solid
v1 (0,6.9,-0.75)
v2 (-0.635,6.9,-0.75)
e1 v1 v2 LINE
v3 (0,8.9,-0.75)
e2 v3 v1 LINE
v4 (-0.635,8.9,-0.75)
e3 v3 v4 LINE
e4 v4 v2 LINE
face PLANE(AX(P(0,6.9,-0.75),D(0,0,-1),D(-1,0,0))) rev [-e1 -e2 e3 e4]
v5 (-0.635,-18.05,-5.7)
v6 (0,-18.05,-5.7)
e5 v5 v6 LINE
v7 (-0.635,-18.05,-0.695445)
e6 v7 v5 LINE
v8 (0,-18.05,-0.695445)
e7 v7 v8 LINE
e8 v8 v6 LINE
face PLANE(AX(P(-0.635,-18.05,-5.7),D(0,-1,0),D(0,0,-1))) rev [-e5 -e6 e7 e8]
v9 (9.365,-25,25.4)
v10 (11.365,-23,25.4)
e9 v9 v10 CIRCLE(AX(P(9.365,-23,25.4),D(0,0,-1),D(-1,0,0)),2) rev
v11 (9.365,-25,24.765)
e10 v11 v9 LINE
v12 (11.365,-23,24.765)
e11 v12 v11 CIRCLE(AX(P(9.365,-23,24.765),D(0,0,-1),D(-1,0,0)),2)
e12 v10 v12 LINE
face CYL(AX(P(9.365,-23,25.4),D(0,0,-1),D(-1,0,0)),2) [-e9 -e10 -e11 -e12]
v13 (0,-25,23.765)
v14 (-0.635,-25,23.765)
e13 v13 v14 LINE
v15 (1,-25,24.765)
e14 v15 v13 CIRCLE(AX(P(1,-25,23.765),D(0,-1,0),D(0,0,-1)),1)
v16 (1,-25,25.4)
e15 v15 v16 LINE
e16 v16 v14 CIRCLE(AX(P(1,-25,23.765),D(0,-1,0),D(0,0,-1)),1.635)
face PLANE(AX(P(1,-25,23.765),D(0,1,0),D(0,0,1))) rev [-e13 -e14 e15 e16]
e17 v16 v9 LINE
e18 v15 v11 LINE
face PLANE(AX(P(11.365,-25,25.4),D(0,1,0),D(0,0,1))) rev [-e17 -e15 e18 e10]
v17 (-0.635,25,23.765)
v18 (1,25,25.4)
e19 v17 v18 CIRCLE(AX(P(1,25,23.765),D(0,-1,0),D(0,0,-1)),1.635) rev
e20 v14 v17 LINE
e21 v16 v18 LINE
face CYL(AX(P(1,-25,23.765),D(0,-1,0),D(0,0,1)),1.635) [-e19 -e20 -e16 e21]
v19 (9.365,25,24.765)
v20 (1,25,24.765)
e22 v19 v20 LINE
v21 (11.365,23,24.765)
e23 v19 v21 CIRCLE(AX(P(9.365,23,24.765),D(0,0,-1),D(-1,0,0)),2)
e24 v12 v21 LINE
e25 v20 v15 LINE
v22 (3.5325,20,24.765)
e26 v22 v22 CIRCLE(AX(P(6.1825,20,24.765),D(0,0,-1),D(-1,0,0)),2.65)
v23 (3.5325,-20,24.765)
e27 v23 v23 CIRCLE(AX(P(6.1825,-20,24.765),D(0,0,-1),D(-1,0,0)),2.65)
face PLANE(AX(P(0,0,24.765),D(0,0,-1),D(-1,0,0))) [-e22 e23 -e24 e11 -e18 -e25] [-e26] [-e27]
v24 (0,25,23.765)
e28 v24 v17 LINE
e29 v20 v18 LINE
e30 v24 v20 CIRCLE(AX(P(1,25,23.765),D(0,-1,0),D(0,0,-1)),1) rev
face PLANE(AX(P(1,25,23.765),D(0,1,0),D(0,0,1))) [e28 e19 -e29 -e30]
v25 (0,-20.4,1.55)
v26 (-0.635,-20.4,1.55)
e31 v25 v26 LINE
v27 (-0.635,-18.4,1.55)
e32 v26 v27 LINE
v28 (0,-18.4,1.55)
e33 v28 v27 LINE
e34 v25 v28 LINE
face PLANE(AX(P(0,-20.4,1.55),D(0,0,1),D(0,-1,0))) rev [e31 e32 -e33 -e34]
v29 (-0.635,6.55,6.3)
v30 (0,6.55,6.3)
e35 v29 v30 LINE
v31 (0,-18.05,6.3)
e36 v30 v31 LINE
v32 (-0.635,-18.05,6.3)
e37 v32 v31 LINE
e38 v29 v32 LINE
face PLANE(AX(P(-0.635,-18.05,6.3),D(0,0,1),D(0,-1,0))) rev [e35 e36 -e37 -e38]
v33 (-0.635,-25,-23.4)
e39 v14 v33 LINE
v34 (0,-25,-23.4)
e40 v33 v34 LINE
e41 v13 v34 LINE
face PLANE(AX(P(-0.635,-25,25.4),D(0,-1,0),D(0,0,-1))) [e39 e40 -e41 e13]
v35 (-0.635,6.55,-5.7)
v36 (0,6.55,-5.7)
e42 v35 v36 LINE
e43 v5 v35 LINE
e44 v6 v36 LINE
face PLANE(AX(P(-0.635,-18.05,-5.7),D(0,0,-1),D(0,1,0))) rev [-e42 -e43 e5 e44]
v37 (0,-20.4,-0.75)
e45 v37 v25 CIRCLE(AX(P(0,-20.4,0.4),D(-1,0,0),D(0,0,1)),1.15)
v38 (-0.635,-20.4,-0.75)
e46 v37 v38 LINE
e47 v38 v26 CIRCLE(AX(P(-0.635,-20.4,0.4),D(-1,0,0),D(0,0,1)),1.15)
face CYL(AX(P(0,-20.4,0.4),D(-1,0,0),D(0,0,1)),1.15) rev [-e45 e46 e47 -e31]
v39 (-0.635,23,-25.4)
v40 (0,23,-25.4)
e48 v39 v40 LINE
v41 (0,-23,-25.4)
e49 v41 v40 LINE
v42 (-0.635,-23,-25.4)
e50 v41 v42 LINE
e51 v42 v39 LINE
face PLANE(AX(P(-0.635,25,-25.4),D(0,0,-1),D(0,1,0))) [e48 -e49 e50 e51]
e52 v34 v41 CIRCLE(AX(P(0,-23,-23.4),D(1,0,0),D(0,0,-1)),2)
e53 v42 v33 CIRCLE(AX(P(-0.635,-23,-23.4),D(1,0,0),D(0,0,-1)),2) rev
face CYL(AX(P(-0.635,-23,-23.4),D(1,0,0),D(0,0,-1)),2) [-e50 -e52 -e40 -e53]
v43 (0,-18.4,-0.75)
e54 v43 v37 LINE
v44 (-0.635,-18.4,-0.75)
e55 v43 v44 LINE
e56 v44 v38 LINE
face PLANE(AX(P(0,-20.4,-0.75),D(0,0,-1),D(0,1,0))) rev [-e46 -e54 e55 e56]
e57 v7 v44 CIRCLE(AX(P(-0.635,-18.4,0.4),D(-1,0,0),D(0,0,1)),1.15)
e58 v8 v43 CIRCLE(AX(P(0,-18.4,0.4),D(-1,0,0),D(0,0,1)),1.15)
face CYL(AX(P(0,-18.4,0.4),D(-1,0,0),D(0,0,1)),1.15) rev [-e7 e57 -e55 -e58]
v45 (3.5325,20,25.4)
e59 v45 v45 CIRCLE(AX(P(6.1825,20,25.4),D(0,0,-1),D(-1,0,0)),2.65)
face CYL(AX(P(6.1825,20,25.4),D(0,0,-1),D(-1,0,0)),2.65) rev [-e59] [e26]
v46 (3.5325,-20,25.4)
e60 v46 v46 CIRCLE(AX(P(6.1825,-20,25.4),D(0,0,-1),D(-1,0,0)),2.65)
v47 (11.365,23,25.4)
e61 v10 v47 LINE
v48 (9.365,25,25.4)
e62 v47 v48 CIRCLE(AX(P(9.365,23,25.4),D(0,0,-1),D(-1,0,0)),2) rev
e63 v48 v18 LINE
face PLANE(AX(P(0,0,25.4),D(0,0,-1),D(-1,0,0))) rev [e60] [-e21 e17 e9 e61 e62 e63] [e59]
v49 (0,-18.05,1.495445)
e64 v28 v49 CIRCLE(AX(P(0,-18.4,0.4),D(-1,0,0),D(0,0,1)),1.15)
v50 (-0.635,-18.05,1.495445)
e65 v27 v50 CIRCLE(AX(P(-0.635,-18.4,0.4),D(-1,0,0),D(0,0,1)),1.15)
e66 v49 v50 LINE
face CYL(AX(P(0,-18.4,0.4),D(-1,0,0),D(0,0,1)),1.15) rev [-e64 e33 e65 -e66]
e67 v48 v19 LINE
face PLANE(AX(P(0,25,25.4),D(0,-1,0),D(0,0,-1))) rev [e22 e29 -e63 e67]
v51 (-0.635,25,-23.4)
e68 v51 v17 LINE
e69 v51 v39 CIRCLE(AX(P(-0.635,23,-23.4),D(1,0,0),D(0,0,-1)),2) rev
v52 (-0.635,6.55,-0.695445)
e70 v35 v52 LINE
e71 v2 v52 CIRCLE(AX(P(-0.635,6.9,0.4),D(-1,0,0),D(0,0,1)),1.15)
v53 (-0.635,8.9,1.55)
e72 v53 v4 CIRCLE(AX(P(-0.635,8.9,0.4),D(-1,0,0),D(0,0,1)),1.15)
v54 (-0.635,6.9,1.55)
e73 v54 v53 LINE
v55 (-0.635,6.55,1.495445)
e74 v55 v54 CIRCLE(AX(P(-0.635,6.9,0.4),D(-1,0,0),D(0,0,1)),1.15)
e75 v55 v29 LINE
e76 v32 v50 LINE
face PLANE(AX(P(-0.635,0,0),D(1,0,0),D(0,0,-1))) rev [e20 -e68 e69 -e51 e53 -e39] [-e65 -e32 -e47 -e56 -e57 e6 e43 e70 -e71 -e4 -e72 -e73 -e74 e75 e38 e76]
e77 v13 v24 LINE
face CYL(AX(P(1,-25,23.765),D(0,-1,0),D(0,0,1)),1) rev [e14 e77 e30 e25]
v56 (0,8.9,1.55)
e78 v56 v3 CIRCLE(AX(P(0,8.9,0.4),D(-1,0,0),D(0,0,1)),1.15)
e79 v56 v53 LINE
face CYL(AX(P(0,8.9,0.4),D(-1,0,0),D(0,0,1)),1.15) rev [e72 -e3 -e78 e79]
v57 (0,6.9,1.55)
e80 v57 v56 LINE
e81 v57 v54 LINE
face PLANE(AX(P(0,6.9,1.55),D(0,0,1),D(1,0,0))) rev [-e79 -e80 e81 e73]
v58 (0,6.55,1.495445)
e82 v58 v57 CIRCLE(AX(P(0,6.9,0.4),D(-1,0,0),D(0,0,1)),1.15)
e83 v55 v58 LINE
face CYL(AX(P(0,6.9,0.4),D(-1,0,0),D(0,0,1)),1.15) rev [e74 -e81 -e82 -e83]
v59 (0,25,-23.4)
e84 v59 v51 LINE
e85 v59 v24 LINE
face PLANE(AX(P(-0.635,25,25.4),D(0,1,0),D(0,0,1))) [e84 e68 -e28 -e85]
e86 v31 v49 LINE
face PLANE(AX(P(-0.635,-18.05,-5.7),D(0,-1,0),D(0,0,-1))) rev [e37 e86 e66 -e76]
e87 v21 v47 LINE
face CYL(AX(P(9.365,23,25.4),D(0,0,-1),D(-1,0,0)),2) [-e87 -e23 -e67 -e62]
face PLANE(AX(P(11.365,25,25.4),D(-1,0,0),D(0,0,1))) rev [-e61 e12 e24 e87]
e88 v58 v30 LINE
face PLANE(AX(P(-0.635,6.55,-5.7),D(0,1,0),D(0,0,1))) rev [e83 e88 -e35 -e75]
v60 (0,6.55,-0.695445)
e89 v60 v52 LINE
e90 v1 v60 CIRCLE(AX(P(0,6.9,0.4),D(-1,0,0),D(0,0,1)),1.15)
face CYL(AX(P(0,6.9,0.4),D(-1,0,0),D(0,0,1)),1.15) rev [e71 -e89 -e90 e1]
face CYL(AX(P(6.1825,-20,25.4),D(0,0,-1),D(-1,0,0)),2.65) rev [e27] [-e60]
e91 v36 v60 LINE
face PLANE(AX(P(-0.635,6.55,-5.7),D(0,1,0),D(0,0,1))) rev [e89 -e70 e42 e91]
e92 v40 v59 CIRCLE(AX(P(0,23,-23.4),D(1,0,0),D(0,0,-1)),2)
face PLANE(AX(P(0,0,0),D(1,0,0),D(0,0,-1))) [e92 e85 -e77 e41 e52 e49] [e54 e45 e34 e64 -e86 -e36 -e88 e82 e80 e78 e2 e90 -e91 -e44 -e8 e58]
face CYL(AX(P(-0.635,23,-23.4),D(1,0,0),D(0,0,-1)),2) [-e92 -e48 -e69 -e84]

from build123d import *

# Parameters (mm, degrees)
SKETCH1_W                    = 50.8
SKETCH1_H                    = 50
BASE_FLANGE1_DEPTH           = 0.635
SKETCH9_W                    = 12
SKETCH9_H                    = 24.6
CUT_EXTRUDE1_DEPTH           = 36.644960724
CUT_EXTRUDE2_DEPTH           = 36.644960724
EDGE_FLANGE1_STRIP_W         = 4.54
EDGE_FLANGE1_STRIP_H         = 0.635
EDGE_FLANGE1_STRIP_CUT_DEPTH = 50
EDGE_FLANGE1_DEPTH           = 50
SKETCH14_R                   = 2.65
CUT_EXTRUDE3_DEPTH           = 58.189950603
FILLET1_R                    = 2


# Sheet-metal steps are written as plain solids
with BuildPart() as part:
    # Sketch1 → Base-Flange1 (new body)
    with BuildSketch(Plane(origin=(0, 0, 0), x_dir=(0, 0, -1), z_dir=(1, 0, 0))):
        Rectangle(SKETCH1_W, SKETCH1_H)
    extrude(amount=-BASE_FLANGE1_DEPTH)

    # Sketch9 → Cut-Extrude1 (cut, through all)
    with BuildSketch(Plane(origin=(0, 0, 0), x_dir=(0, 0, -1), z_dir=(1, 0, 0))):
        with Locations((-0.3, -5.75)):
            Rectangle(SKETCH9_W, SKETCH9_H)
    extrude(amount=-CUT_EXTRUDE1_DEPTH, mode=Mode.SUBTRACT)

    # Sketch10 → Cut-Extrude2 (cut, through all)
    with BuildSketch(Plane.ZY.offset(0.635)):
        with BuildLine():
            Line((-0.75, -20.4), (-0.75, -18.4))
            ThreePointArc((-0.75, -18.4), (0.4, -17.25), (1.55, -18.4))
            Line((1.55, -18.4), (1.55, -20.4))
            ThreePointArc((1.55, -20.4), (0.4, -21.55), (-0.75, -20.4))
        make_face()
        with BuildLine():
            Line((-0.75, 6.9), (-0.75, 8.9))
            ThreePointArc((-0.75, 8.9), (0.4, 10.05), (1.55, 8.9))
            Line((1.55, 8.9), (1.55, 6.9))
            ThreePointArc((1.55, 6.9), (0.4, 5.75), (-0.75, 6.9))
        make_face()
    extrude(amount=-CUT_EXTRUDE2_DEPTH, mode=Mode.SUBTRACT)

    # Edge-Flange1 strip (across the edge) → Edge-Flange1 strip cut (cut)
    with BuildSketch(Plane(origin=(0, 25, 25.4), x_dir=(0, 0, -1), z_dir=(0, -1, 0))):
        with Locations((-0.635, -0.3175)):
            Rectangle(EDGE_FLANGE1_STRIP_W, EDGE_FLANGE1_STRIP_H)
    extrude(amount=EDGE_FLANGE1_STRIP_CUT_DEPTH, mode=Mode.SUBTRACT)

    # Edge-Flange1 section (across the edge) → Edge-Flange1 (add)
    with BuildSketch(Plane(origin=(0, 25, 25.4), x_dir=(0, 0, -1), z_dir=(0, -1, 0))):
        with BuildLine():
            Line((0, 1), (0, 11.365))
            Line((0, 11.365), (0.635, 11.365))
            Line((0.635, 11.365), (0.635, 1))
            ThreePointArc((0.635, 1), (0.927893219, 0.292893219), (1.635, 0))
            Line((1.635, 0), (1.635, -0.635))
            ThreePointArc((1.635, -0.635), (0.478880413, -0.156119587), (0, 1))
        make_face()
    extrude(amount=EDGE_FLANGE1_DEPTH)

    # Sketch14 → Cut-Extrude3 (cut, through all)
    with BuildSketch(Plane(origin=(0, 0, 24.765), x_dir=(-1, 0, 0), z_dir=(0, 0, -1))):
        with Locations((-6.1825, -20)):
            Circle(SKETCH14_R)
        with Locations((-6.1825, 20)):
            Circle(SKETCH14_R)
    extrude(amount=-CUT_EXTRUDE3_DEPTH, mode=Mode.SUBTRACT)

    # Fillet1
    fillet1_edges = [part.edges().sort_by_distance(p)[0] for p in [
        (11.365, 25, 25.0825),
        (11.365, -25, 25.0825),
        (-0.3175, -25, -25.4),
        (-0.3175, 25, -25.4),
    ]]
    fillet(fillet1_edges, radius=FILLET1_R)


solid = part.part
